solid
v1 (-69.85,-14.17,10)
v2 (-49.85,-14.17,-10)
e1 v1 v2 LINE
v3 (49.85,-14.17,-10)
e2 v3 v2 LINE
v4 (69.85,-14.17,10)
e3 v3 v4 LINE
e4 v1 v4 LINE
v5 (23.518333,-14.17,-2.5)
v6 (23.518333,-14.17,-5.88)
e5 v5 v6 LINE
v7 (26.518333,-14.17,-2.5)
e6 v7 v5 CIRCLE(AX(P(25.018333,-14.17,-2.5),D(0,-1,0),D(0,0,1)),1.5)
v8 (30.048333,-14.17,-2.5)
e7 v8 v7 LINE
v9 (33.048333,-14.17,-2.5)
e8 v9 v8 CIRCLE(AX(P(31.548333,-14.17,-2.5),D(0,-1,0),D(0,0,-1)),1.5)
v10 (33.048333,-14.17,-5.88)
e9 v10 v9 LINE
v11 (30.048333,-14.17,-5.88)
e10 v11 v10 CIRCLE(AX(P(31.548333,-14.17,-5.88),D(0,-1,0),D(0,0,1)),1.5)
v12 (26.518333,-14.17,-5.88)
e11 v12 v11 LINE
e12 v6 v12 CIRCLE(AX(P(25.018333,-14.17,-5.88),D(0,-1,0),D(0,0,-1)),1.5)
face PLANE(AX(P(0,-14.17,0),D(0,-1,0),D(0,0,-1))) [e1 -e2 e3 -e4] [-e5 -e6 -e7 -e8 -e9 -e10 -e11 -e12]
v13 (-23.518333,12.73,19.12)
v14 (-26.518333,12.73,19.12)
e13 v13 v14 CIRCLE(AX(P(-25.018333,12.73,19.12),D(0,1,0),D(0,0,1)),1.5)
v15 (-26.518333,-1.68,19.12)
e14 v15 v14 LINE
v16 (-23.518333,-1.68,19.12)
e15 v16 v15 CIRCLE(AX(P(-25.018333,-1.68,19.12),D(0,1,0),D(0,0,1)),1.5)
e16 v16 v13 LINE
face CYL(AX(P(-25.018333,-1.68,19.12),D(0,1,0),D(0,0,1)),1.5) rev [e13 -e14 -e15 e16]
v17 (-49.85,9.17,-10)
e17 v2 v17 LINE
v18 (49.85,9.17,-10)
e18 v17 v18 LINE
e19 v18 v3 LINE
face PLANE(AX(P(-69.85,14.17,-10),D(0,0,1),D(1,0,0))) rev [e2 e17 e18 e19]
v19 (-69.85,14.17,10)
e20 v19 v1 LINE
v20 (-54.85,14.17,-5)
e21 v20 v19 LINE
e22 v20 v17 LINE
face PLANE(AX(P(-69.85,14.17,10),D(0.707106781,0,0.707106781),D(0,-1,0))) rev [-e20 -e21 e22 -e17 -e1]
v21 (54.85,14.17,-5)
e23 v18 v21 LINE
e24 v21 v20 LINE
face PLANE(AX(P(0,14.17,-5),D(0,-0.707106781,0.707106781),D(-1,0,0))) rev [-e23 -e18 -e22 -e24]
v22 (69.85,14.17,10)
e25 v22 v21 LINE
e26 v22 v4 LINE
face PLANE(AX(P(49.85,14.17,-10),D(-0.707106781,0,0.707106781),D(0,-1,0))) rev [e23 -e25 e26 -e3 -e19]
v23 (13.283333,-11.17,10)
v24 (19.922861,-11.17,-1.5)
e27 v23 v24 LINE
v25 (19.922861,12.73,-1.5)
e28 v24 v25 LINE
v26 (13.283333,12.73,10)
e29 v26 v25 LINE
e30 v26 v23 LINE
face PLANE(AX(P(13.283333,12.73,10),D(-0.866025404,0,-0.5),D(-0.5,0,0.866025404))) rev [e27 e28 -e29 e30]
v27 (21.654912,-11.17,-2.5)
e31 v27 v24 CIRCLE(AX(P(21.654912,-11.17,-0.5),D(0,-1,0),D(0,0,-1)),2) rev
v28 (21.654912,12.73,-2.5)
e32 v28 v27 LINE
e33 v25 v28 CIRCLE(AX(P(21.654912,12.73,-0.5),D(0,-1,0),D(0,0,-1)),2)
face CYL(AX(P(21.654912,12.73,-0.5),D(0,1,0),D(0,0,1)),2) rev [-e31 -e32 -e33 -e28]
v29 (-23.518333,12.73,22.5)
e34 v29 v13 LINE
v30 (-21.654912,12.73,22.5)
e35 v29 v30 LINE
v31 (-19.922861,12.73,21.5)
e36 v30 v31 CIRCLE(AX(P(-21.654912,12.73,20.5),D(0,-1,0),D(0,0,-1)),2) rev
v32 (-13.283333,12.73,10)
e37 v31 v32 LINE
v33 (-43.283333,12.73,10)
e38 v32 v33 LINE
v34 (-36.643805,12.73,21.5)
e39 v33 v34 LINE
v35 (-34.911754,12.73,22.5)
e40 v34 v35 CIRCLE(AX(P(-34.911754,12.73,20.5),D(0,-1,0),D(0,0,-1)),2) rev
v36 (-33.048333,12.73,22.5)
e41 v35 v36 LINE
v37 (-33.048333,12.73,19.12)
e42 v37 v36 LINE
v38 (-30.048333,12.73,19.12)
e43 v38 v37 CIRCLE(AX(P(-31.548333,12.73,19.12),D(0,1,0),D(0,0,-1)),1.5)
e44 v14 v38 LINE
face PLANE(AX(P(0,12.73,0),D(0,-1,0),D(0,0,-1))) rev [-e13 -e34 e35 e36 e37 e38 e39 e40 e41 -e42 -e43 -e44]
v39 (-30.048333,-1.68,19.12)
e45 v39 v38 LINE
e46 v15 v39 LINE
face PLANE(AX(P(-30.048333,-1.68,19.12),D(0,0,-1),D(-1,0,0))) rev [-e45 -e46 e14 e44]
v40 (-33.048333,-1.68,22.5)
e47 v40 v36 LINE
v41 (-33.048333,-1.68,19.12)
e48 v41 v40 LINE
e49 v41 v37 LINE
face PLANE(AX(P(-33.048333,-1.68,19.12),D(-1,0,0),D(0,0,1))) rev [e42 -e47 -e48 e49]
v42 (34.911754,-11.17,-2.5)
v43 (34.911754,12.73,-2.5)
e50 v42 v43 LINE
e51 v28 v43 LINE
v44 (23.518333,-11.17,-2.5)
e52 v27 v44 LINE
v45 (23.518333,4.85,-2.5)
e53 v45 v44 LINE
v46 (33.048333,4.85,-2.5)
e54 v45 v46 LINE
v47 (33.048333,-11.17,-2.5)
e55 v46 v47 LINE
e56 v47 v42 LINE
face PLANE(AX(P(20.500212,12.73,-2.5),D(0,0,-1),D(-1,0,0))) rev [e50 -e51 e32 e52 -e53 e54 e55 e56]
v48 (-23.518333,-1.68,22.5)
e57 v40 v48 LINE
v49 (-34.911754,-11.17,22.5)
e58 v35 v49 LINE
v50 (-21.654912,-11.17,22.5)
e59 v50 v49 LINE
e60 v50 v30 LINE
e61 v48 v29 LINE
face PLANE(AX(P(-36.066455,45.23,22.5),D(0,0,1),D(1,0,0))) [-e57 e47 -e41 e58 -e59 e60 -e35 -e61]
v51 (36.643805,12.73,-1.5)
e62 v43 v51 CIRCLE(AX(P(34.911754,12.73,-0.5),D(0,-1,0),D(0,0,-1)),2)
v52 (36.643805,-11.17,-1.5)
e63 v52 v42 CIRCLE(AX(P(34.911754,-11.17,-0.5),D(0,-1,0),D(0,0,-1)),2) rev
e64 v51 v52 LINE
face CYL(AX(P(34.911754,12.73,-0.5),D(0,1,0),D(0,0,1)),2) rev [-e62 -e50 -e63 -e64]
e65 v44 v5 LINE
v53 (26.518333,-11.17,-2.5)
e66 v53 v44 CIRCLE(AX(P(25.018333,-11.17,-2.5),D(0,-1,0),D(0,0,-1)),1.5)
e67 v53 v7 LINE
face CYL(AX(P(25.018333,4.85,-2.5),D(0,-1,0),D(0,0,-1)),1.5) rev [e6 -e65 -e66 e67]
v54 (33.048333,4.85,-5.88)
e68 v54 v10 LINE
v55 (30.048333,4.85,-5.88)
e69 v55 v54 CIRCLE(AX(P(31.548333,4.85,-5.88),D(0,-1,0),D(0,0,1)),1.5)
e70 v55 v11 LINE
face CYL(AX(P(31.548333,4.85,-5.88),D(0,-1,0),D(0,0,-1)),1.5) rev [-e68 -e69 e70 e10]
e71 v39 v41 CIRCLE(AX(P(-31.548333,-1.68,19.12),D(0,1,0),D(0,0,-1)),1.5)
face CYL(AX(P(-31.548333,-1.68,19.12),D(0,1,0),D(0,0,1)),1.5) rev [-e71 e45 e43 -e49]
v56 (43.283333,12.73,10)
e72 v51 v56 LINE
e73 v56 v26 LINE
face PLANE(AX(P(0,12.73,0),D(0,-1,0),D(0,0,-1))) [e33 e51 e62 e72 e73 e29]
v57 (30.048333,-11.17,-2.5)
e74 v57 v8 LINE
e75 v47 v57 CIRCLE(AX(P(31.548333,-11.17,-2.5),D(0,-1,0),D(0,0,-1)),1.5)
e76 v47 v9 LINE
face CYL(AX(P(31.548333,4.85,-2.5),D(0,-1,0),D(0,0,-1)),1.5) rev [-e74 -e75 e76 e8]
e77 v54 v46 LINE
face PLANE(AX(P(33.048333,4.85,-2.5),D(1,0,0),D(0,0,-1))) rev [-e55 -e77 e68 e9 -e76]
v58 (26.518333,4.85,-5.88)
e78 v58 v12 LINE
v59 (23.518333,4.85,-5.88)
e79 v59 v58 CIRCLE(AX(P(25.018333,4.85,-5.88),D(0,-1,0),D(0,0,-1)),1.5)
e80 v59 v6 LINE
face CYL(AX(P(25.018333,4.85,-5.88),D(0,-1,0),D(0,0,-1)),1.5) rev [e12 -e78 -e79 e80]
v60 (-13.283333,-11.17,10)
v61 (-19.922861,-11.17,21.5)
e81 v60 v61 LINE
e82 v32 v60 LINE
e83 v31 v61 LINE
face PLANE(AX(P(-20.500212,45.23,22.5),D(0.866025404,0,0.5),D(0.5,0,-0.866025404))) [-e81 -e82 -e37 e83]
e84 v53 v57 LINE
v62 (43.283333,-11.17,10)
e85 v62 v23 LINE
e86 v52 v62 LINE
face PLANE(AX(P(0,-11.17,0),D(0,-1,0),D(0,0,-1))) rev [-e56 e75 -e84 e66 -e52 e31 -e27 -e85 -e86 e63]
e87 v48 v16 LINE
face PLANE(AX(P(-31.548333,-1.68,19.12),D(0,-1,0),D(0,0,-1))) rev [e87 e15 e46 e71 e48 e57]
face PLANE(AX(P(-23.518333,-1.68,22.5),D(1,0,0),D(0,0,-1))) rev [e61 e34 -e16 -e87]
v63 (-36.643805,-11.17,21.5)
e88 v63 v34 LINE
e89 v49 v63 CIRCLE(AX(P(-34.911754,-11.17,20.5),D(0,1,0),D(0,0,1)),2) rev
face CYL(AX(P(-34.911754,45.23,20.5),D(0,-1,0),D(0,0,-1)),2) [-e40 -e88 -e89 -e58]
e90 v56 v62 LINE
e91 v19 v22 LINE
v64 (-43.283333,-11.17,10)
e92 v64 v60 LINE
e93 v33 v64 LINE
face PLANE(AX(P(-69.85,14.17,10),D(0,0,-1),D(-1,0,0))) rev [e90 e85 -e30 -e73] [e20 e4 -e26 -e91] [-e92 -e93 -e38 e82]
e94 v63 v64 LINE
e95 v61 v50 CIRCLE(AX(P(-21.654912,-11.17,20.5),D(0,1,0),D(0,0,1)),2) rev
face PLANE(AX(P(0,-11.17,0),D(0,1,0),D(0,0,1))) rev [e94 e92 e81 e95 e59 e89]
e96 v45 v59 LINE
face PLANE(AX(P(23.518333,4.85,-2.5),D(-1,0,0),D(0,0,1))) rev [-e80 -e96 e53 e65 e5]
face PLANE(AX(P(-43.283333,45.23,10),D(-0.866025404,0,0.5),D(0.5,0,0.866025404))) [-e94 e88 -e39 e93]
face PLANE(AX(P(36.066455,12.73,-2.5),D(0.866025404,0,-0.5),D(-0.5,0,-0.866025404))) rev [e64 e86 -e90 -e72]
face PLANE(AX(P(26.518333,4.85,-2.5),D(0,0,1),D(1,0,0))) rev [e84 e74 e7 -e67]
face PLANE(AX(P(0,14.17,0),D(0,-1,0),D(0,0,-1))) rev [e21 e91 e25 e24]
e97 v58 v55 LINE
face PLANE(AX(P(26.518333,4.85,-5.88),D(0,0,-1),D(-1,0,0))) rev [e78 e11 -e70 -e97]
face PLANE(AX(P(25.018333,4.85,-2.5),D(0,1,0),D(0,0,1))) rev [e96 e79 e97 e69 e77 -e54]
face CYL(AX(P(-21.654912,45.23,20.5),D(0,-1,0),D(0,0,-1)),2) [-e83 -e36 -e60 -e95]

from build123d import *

# Parameters (mm, degrees)
SKETCH1_W           = 139.7
SKETCH1_H           = 20
BOSS_EXTRUDE1_DEPTH = 14.17
CUT_EXTRUDE1_DEPTH  = 23.9
BOSS_EXTRUDE2_DEPTH = 23.9
CHAMFER1_SIZE       = 20
CHAMFER2_SIZE       = 5
CUT_EXTRUDE2_DEPTH  = 14.41
CUT_EXTRUDE3_DEPTH  = 19.02
FILLET1_R           = 2


with BuildPart() as part:
    # Sketch1 → Boss-Extrude1 (new, symmetric)
    with BuildSketch(Plane(origin=(0, 0, 0), x_dir=(1, 0, 0), z_dir=(0, 1, 0))):
        Rectangle(SKETCH1_W, SKETCH1_H)
    extrude(amount=BOSS_EXTRUDE1_DEPTH, both=True)

    # Sketch3 → Cut-Extrude1 (cut)
    with BuildSketch(Plane(origin=(0, -11.17, 0), x_dir=(-1, 0, 0), z_dir=(0, -1, 0))):
        Polygon((-13.283333333, -10), (-20.500211698, 2.5), (-36.066454968, 2.5), (-43.283333333, -10), align=None)
    extrude(amount=-CUT_EXTRUDE1_DEPTH, mode=Mode.SUBTRACT)

    # Sketch4 → Boss-Extrude2 (add)
    with BuildSketch(Plane(origin=(0, -11.17, 0), x_dir=(-1, 0, 0), z_dir=(0, -1, 0))):
        Polygon((43.283333333, -10), (13.283333333, -10), (20.500211698, -22.5), (36.066454968, -22.5), align=None)
    extrude(amount=-BOSS_EXTRUDE2_DEPTH)

    # Chamfer1
    chamfer1_edges = [part.edges().sort_by_distance(p)[0] for p in [
        (69.85, 0, -10),
        (-69.85, 0, -10),
    ]]
    chamfer(chamfer1_edges, length=CHAMFER1_SIZE - 0.0001)  # a hair under: the kernel refuses the full size

    # Chamfer2
    chamfer2_edges = [part.edges().sort_by_distance(p)[0] for p in [
        (0, 14.17, -10),
    ]]
    chamfer(chamfer2_edges, length=CHAMFER2_SIZE)

    # Sketch5 → Cut-Extrude2 (cut)
    with BuildSketch(Plane(origin=(0, 12.73, 0), x_dir=(1, 0, 0), z_dir=(0, 1, 0))):
        with BuildLine():
            Line((-33.048333333, -19.12), (-33.048333333, -22.5))
            Line((-33.048333333, -22.5), (-23.518333333, -22.5))
            Line((-23.518333333, -22.5), (-23.518333333, -19.12))
            ThreePointArc((-23.518333333, -19.12), (-25.018333333, -17.62), (-26.518333333, -19.12))
            Line((-26.518333333, -19.12), (-30.048333333, -19.12))
            ThreePointArc((-30.048333333, -19.12), (-31.548333333, -17.62), (-33.048333333, -19.12))
        make_face()
    extrude(amount=-CUT_EXTRUDE2_DEPTH, mode=Mode.SUBTRACT)

    # Sketch7 → Cut-Extrude3 (cut)
    with BuildSketch(Plane.XZ.offset(14.17)):
        with BuildLine():
            Line((23.518333333, -2.5), (23.518333333, -5.88))
            ThreePointArc((23.518333333, -5.88), (25.018333333, -7.38), (26.518333333, -5.88))
            Line((26.518333333, -5.88), (30.048333333, -5.88))
            ThreePointArc((30.048333333, -5.88), (31.548333333, -7.38), (33.048333333, -5.88))
            Line((33.048333333, -5.88), (33.048333333, -2.5))
            ThreePointArc((33.048333333, -2.5), (31.548333333, -1), (30.048333333, -2.5))
            Line((30.048333333, -2.5), (26.518333333, -2.5))
            ThreePointArc((26.518333333, -2.5), (25.018333333, -1), (23.518333333, -2.5))
        make_face()
    extrude(amount=-CUT_EXTRUDE3_DEPTH, mode=Mode.SUBTRACT)

    # Fillet1
    fillet1_edges = [part.edges().sort_by_distance(p)[0] for p in [
        (36.066454968, 0.78, -2.5),
        (20.500211698, 0.78, -2.5),
        (-36.066454968, 0.78, 22.5),
        (-20.500211698, 0.78, 22.5),
    ]]
    fillet(fillet1_edges, radius=FILLET1_R)


solid = part.part
